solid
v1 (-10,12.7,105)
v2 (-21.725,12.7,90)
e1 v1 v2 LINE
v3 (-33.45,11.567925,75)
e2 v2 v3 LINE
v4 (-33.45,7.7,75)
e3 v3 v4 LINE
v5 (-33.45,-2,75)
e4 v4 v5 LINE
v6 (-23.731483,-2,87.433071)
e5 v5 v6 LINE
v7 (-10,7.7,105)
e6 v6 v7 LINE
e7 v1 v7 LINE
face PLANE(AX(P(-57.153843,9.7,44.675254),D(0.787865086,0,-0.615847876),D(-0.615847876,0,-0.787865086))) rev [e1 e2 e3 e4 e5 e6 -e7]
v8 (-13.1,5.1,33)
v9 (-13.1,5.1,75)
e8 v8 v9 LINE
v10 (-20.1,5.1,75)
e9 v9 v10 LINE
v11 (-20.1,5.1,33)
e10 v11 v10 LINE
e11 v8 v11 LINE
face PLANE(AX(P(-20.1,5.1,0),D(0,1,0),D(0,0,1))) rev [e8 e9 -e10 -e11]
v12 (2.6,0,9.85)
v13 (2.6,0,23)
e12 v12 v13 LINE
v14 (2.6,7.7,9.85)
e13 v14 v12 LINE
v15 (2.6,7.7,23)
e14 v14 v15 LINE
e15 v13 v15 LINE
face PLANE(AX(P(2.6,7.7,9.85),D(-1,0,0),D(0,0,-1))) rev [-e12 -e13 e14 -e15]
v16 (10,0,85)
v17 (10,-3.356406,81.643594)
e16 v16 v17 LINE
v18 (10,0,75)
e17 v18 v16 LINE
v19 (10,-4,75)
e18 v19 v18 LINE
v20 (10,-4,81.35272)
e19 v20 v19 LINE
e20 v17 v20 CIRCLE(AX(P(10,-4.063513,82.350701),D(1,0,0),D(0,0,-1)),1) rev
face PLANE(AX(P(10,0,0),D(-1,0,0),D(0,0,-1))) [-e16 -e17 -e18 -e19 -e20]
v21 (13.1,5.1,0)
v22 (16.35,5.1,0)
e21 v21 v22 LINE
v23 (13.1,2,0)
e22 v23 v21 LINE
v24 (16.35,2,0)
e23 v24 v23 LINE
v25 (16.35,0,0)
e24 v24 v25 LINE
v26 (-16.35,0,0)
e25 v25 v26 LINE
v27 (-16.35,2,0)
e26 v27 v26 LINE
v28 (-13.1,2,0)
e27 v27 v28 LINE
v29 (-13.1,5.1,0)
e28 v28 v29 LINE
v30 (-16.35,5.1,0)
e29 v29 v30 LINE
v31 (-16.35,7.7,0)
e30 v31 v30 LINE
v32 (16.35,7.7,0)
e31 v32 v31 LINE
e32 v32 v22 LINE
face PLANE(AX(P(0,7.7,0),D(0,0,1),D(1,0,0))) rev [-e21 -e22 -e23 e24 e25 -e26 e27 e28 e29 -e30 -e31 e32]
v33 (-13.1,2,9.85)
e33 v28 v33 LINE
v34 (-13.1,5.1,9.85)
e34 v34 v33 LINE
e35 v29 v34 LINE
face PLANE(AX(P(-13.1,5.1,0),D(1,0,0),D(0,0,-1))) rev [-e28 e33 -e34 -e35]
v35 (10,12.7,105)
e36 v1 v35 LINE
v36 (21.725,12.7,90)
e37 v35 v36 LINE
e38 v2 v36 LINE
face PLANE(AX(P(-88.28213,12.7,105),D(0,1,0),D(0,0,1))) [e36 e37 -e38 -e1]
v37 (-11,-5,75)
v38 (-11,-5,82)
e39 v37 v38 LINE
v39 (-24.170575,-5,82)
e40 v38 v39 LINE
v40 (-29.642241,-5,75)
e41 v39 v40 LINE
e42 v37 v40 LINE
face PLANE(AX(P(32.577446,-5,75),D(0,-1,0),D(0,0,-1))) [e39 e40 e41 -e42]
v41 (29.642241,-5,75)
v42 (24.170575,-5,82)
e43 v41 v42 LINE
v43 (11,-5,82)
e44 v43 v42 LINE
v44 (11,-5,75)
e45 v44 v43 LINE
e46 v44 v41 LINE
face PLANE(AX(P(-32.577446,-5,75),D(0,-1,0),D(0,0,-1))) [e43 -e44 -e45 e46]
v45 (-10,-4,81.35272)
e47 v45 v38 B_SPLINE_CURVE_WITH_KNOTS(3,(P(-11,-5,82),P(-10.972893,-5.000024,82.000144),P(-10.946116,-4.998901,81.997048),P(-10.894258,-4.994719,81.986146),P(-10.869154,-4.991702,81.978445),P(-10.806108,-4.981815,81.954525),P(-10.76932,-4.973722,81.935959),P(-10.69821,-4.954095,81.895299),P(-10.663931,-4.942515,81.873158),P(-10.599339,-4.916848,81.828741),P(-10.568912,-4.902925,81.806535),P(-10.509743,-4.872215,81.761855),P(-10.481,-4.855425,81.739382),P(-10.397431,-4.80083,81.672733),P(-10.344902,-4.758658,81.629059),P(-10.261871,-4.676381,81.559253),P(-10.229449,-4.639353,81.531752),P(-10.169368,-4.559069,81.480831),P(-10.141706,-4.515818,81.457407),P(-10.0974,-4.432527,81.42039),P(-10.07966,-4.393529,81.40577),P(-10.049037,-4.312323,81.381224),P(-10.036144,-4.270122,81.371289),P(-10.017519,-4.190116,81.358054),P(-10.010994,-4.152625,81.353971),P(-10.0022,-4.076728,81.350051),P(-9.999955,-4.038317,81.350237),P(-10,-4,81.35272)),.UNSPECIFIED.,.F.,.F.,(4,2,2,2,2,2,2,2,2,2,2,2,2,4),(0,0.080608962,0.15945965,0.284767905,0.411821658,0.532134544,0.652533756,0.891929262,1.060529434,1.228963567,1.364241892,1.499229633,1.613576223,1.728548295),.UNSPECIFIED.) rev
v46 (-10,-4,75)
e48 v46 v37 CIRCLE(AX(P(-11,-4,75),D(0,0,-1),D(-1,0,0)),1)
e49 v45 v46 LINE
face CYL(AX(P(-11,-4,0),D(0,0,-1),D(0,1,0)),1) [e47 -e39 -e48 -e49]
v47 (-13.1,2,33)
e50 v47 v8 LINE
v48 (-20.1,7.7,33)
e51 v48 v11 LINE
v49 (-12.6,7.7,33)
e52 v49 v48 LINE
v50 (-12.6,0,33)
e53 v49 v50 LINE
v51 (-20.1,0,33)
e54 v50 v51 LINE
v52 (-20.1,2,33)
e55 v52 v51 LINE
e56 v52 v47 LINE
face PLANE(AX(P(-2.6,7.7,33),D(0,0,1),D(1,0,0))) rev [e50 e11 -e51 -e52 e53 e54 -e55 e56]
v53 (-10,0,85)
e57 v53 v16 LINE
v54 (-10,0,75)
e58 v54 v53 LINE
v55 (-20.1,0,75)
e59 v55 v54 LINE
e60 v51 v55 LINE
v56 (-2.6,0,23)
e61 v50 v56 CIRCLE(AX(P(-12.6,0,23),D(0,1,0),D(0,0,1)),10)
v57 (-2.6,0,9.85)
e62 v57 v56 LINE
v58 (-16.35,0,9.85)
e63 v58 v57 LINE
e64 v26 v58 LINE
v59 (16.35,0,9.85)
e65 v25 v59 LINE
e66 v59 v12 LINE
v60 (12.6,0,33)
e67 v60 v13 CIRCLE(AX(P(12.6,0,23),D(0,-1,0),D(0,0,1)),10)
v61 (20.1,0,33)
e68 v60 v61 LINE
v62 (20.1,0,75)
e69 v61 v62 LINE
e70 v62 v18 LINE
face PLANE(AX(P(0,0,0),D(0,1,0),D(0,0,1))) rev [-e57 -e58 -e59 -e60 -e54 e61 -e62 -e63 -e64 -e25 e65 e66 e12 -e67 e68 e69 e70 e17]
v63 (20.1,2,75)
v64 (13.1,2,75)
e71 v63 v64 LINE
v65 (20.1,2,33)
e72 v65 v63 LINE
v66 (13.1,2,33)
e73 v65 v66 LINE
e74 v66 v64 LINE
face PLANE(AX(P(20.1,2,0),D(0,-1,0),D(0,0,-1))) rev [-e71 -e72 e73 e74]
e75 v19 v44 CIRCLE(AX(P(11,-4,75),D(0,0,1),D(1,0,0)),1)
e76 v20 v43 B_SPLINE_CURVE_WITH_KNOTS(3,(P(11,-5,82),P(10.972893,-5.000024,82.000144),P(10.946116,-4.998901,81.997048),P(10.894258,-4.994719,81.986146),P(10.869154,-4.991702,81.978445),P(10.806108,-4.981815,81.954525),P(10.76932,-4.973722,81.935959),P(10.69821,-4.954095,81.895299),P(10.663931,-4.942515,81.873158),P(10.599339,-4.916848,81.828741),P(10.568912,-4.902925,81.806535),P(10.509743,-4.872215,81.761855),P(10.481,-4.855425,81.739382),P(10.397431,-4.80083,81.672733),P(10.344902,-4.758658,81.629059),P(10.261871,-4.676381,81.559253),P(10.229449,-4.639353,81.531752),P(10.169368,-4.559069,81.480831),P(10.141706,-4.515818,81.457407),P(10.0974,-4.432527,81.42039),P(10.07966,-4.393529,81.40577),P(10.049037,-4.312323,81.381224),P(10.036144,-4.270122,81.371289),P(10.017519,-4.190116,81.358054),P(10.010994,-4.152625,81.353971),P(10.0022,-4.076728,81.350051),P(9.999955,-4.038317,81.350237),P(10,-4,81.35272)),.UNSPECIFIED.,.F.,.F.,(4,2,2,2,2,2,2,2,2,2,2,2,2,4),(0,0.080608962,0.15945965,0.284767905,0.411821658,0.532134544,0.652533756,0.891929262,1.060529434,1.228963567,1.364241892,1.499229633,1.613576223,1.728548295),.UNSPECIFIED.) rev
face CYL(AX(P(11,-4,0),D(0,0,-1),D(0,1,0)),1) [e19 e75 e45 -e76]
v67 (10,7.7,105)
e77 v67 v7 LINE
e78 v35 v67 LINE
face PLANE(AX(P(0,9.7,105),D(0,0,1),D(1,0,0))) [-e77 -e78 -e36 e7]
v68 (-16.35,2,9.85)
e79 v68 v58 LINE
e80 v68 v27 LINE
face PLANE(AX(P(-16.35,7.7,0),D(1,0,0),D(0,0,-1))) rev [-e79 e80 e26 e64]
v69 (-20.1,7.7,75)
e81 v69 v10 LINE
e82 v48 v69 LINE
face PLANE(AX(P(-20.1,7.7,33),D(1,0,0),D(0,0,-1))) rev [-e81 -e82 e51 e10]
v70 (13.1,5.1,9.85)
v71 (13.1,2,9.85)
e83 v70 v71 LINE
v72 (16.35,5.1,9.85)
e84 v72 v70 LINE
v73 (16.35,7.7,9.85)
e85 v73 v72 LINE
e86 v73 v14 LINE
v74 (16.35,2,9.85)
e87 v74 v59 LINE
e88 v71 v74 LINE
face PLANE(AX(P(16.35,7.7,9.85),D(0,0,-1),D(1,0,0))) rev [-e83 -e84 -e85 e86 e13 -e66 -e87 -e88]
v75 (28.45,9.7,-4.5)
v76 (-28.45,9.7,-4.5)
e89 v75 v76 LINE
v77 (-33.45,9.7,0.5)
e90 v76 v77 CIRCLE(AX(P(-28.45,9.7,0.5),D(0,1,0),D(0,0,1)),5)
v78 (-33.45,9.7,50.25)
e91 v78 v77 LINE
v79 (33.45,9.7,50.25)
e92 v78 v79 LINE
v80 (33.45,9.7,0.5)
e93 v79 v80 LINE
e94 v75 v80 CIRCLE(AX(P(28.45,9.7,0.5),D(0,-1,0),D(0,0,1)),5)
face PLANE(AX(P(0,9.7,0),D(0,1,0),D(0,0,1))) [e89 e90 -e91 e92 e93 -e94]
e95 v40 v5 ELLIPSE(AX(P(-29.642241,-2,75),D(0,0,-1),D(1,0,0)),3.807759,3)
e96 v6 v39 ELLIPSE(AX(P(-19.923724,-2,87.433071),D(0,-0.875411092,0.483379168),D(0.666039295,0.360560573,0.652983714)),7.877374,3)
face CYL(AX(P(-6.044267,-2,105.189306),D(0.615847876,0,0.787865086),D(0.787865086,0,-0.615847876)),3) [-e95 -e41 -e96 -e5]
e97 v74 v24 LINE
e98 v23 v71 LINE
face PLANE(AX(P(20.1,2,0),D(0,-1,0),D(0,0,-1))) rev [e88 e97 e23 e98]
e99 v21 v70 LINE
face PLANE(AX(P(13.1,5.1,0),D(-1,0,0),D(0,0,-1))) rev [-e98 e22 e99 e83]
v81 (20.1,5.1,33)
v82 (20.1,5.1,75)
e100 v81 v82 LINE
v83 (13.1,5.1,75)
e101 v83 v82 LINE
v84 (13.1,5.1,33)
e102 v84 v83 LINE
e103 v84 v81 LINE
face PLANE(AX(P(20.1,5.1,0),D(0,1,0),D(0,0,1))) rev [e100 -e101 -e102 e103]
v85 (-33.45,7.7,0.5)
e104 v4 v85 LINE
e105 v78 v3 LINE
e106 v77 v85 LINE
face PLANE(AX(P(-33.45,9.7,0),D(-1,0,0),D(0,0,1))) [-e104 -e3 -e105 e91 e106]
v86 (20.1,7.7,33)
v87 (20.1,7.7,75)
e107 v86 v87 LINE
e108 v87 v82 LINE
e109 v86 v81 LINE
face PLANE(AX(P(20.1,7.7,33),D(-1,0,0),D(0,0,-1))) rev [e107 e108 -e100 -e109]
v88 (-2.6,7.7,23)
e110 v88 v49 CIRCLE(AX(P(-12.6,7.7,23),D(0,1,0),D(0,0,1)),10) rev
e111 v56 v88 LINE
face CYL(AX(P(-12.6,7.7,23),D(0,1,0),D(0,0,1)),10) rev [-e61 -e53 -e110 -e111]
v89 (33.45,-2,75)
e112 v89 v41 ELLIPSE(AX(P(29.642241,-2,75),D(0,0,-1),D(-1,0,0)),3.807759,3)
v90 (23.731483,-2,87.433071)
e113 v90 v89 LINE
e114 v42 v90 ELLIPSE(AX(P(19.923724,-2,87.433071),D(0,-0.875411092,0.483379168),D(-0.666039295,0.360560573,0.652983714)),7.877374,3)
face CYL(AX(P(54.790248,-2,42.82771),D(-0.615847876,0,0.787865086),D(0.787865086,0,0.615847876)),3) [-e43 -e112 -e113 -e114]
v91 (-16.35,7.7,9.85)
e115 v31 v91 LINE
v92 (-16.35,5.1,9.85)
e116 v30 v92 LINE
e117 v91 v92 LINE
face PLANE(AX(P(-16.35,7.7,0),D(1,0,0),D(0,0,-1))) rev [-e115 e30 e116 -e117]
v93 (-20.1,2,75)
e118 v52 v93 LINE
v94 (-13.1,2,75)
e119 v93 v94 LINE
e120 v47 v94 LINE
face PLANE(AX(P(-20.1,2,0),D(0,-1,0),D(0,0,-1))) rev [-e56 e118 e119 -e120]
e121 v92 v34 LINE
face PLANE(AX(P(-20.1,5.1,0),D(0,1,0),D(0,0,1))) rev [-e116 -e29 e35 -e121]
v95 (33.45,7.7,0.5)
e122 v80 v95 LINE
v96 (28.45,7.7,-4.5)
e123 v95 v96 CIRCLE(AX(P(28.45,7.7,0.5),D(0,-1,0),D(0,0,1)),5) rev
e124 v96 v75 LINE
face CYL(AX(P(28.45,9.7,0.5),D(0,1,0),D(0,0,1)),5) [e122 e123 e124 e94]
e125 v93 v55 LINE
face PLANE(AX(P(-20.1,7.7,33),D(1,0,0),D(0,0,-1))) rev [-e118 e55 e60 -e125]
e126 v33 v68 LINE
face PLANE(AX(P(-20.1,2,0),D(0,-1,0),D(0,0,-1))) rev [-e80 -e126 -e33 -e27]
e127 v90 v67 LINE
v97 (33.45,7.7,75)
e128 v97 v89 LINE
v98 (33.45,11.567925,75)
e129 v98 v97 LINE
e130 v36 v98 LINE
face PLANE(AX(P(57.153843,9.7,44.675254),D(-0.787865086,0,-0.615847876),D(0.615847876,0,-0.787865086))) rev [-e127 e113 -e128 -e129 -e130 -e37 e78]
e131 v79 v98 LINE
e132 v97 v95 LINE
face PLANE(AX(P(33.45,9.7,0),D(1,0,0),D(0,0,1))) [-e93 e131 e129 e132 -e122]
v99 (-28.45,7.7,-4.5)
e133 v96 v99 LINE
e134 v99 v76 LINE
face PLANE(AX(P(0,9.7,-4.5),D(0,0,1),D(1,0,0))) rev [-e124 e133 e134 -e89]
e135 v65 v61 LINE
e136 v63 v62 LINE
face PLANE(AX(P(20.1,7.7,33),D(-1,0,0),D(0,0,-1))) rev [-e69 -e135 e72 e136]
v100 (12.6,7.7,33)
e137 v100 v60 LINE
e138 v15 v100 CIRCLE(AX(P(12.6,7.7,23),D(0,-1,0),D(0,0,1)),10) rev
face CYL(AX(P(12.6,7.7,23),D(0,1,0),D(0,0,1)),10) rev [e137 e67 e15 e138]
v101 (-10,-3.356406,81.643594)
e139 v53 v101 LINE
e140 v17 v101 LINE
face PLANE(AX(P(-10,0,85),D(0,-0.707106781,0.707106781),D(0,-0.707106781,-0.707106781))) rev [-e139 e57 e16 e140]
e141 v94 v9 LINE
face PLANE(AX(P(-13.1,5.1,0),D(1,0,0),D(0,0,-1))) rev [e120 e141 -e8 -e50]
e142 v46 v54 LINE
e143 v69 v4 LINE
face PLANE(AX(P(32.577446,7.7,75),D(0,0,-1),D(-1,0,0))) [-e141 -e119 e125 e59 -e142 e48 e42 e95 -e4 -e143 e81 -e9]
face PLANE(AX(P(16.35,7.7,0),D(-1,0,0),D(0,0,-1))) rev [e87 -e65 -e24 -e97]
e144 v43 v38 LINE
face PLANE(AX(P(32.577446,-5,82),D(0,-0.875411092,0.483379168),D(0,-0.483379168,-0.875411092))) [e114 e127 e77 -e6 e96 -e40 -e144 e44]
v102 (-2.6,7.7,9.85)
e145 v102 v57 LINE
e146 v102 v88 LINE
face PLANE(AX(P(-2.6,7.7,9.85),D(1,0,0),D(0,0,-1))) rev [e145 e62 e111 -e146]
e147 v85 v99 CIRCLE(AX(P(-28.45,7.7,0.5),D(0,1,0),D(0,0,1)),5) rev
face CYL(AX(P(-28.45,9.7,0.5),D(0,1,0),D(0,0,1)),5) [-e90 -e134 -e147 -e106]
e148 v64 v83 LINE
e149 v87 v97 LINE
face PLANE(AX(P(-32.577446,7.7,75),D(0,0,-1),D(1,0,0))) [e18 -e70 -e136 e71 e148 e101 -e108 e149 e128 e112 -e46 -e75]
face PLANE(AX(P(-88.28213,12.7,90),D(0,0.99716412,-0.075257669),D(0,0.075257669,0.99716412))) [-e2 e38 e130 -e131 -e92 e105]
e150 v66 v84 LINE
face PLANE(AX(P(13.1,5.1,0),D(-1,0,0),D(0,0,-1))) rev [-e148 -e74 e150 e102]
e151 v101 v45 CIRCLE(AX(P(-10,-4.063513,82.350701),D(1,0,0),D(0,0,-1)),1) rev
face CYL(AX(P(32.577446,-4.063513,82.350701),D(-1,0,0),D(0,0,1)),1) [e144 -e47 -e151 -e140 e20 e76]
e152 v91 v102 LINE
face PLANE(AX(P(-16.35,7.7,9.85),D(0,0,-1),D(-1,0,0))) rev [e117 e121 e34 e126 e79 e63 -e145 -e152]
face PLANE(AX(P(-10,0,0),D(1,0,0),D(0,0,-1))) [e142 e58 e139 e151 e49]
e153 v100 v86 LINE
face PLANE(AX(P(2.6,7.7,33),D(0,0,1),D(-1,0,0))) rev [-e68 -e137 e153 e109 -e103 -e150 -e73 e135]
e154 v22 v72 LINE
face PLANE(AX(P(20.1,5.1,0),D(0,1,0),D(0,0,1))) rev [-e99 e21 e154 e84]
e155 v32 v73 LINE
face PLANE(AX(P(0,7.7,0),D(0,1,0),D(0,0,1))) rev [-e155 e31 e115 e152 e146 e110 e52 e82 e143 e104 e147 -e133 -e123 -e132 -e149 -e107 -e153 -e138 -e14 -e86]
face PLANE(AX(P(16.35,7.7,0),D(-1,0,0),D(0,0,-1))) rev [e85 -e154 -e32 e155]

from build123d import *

# Parameters (mm, degrees)
BOSS_EXTRUDE1_DEPTH     = 7.7
SKETCH2_W               = 7
SKETCH2_H               = 3.1
CUT_EXTRUDE1_DEPTH      = 79.027559234
FILLET1_R               = 10
BOSS_EXTRUDE2_DEPTH     = 2
BOSS_EXTRUDE3_DEPTH     = 33.45
BOSS_EXTRUDE4_REACH     = 112.929
CUT_EXTRUDE2_DEPTH      = 111.928772192
CUT_EXTRUDE2_DEPTH_BACK = 111.928772192
CUT_EXTRUDE3_DEPTH      = 10
FILLET3_R               = 1
FILLET4_R               = 5
FILLET5_R               = 3


with BuildPart() as part:
    # Sketch1 → Boss-Extrude1 (new body)
    with BuildSketch(Plane(origin=(0, 0, 0), x_dir=(1, 0, 0), z_dir=(0, 1, 0))):
        Polygon((0, 0), (-16.35, 0), (-16.35, -9.85), (-2.6, -9.85), (-2.6, -33), (-20.1, -33), (-20.1, -75), (0, -75), align=None)
    extrude(amount=BOSS_EXTRUDE1_DEPTH)

    # Sketch2 → Cut-Extrude1 (cut, through all)
    with BuildSketch(Plane.XY.offset(75)):
        with Locations((-16.6, 3.55)):
            Rectangle(SKETCH2_W, SKETCH2_H)
    extrude(amount=-CUT_EXTRUDE1_DEPTH, mode=Mode.SUBTRACT)

    # Fillet1
    fillet1_edges = [part.edges().sort_by_distance(p)[0] for p in [
        (-2.6, 3.85, 33),
    ]]
    fillet(fillet1_edges, radius=FILLET1_R)

    # Sketch3 → Boss-Extrude2 (add)
    with BuildSketch(Plane(origin=(0, 7.7, 0), x_dir=(1, 0, 0), z_dir=(0, 1, 0))):
        Polygon((0, 4.5), (-33.45, 4.5), (-33.45, -75), (-10, -105), (0, -105), align=None)
    extrude(amount=BOSS_EXTRUDE2_DEPTH)

    # Sketch4 → Boss-Extrude3 (add)
    with BuildSketch(Plane(origin=(0, 0, 0), x_dir=(0, 0, -1), z_dir=(1, 0, 0))):
        Polygon((-105, 9.7), (-105, 12.7), (-90, 12.7), (-50.25, 9.7), align=None)
    extrude(amount=-BOSS_EXTRUDE3_DEPTH)

    # Boss-Extrude4: up to this face of the body (flat: up to its plane)
    boss_extrude4_end = Plane(part.part.faces().sort_by_distance((0, 5.848980441, 46.191947566))[0])
    # Sketch5 → Boss-Extrude4 (add, up to the picked face)
    with BuildSketch(Plane.ZY.offset(33.45), mode=Mode.PRIVATE) as boss_extrude4_sk1:
        Polygon((75, 7.7), (75, -5), (82, -5), (105, 7.7), align=None)
    boss_extrude4_tool1 = split(extrude(boss_extrude4_sk1.sketch, amount=-BOSS_EXTRUDE4_REACH, mode=Mode.PRIVATE), bisect_by=boss_extrude4_end, keep=Keep.BOTH, mode=Mode.PRIVATE)
    add(boss_extrude4_tool1.solids().sort_by(Axis((-33.45, 2.665766, 85.441441), (1, 0, 0)))[0])

    # Sketch6 → Cut-Extrude2 (cut, two sides: drawn at the far end of the back side and taken through both)
    with BuildSketch(Plane(origin=(0, 7.7, 0), x_dir=(1, 0, 0), z_dir=(0, 1, 0)).offset(-CUT_EXTRUDE2_DEPTH_BACK)):
        Polygon((-33.45, -75), (-10, -105), (-33.45, -105), align=None)
    extrude(amount=CUT_EXTRUDE2_DEPTH + CUT_EXTRUDE2_DEPTH_BACK, mode=Mode.SUBTRACT)

    # Sketch7 → Cut-Extrude3 (cut)
    with BuildSketch(Plane(origin=(0, 0, 0), x_dir=(0, 0, -1), z_dir=(1, 0, 0))):
        Polygon((-75, 0), (-85, 0), (-80, -5), (-75, -5), align=None)
    extrude(amount=-CUT_EXTRUDE3_DEPTH, mode=Mode.SUBTRACT)

    # Fillet3
    # the kernel refuses this fillet: 1 mm, written as the material it takes off along each edge
    with BuildSketch(Plane(origin=(5.810983209, -5, 80), x_dir=(0, 0, 1), z_dir=(-1, 0, 0))) as fillet3_piece_1:
        with BuildLine():
            CenterArc((2.350701034, 0.936487472), FILLET3_R, 135, 114.469800521)
            Line((1.643594253, 1.643594253), (1.629452117, 1.657736389))
            Line((1.629452117, 1.657736389), (-0.014142136, 0.014142136))
            Line((-0.014142136, 0.014142136), (0, -0.02))
            ThreePointArc((0, -0.02), (1, -0.02), (1.992985979, -0.018729749))
            Line((1.992985979, -0.018729749), (2, 0))
        make_face()
    extrude(amount=15.810983209, mode=Mode.SUBTRACT)
    with BuildSketch(Plane(origin=(-10, -5, 82.5), x_dir=(-1, 0, 0), z_dir=(0, 0, -1))) as fillet3_piece_2_section:
        with BuildLine():
            CenterArc((FILLET3_R, FILLET3_R), FILLET3_R, 180, 90)
            Line((0, FILLET3_R), (-FILLET3_R * 0.02, FILLET3_R))
            Line((-FILLET3_R * 0.02, FILLET3_R), (-FILLET3_R * 0.02, -FILLET3_R * 0.02))
            Line((-FILLET3_R * 0.02, -FILLET3_R * 0.02), (FILLET3_R, -FILLET3_R * 0.02))
            Line((FILLET3_R, -FILLET3_R * 0.02), (FILLET3_R, 0))
        make_face()
    fillet3_piece_2 = extrude(amount=10, mode=Mode.PRIVATE)
    fillet3_piece_2 = split(fillet3_piece_2, bisect_by=Plane(origin=(-10.222841489, -6.700692184, 78.299307816), z_dir=(0, 0.7071067811865466, -0.7071067811865485)), keep=Keep.TOP, mode=Mode.PRIVATE)
    add(fillet3_piece_2, mode=Mode.SUBTRACT)
    with BuildSketch(Plane(origin=(5.810983209, -5, 80), x_dir=(0, 0, 1), z_dir=(-1, 0, 0))) as fillet3_piece_3a_section:
        with BuildLine():
            CenterArc((2.350701034, 0.936487472), FILLET3_R, 135, 114.469800521)
            Line((1.643594253, 1.643594253), (1.629452117, 1.657736389))
            Line((1.629452117, 1.657736389), (-0.014142136, 0.014142136))
            Line((-0.014142136, 0.014142136), (0, -0.02))
            ThreePointArc((0, -0.02), (1, -0.02), (1.992985979, -0.018729749))
            Line((1.992985979, -0.018729749), (2, 0))
        make_face()
    fillet3_piece_3a = extrude(amount=21.621966417, mode=Mode.PRIVATE)
    fillet3_piece_3a = split(fillet3_piece_3a, bisect_by=Plane(origin=(-10, -4.567151235, 80.996776665), z_dir=(-1, 0, 0)), keep=Keep.TOP, mode=Mode.PRIVATE)
    with BuildSketch(Plane(origin=(-10, -5, 82.5), x_dir=(-1, 0, 0), z_dir=(0, 0, -1))) as fillet3_piece_3b_section:
        with BuildLine():
            CenterArc((FILLET3_R, FILLET3_R), FILLET3_R, 180, 90)
            Line((0, FILLET3_R), (-FILLET3_R * 0.02, FILLET3_R))
            Line((-FILLET3_R * 0.02, FILLET3_R), (-FILLET3_R * 0.02, -FILLET3_R * 0.02))
            Line((-FILLET3_R * 0.02, -FILLET3_R * 0.02), (FILLET3_R, -FILLET3_R * 0.02))
            Line((FILLET3_R, -FILLET3_R * 0.02), (FILLET3_R, 0))
        make_face()
    fillet3_piece_3b = extrude(amount=10, mode=Mode.PRIVATE)
    fillet3_piece_3b = split(fillet3_piece_3b, bisect_by=Plane(origin=(-10.238471404, -4.220535034, 80.779464966), z_dir=(0, -0.7071067811865466, 0.7071067811865485)), keep=Keep.TOP, mode=Mode.PRIVATE)
    fillet3_piece_3 = fillet3_piece_3a & fillet3_piece_3b
    add(fillet3_piece_3, mode=Mode.SUBTRACT)

    # Fillet4
    fillet4_edges = [part.edges().sort_by_distance(p)[0] for p in [
        (-33.45, 8.7, -4.5),
    ]]
    fillet(fillet4_edges, radius=FILLET4_R)

    # Mirror1: part across plane


with BuildPart() as part_1:
    add(part.part)
    add(part.part.mirror(Plane(origin=(0, 7.7, 75), x_dir=(0, 0, 1), z_dir=(-1, 0, 0))))

    # Fillet5
    # the kernel refuses this fillet: 3 mm, written as the material it takes off along each edge
    with BuildSketch(Plane(origin=(-38.068859068, -5, 69.091011854), x_dir=(0.7878650861711843, 0, -0.6158478756904764), z_dir=(0.6158478756904763, 0, 0.7878650861711843))) as fillet5_piece_1:
        with BuildLine():
            CenterArc((FILLET5_R, FILLET5_R), FILLET5_R, 180, 90)
            Line((0, FILLET5_R), (0, 0))
            Line((0, 0), (FILLET5_R, 0))
        make_face()
    extrude(amount=23.884769896, mode=Mode.SUBTRACT)
    with BuildSketch(Plane(origin=(38.068859068, -5, 69.091011854), x_dir=(-0.7878650861711843, 0, -0.6158478756904764), z_dir=(-0.6158478756904763, 0, 0.7878650861711843))) as fillet5_piece_2:
        with BuildLine():
            CenterArc((FILLET5_R, -FILLET5_R), FILLET5_R, 90, 90)
            Line((0, -FILLET5_R), (0, 0))
            Line((0, 0), (FILLET5_R, 0))
        make_face()
    extrude(amount=23.884769896, mode=Mode.SUBTRACT)


solid = part_1.part
